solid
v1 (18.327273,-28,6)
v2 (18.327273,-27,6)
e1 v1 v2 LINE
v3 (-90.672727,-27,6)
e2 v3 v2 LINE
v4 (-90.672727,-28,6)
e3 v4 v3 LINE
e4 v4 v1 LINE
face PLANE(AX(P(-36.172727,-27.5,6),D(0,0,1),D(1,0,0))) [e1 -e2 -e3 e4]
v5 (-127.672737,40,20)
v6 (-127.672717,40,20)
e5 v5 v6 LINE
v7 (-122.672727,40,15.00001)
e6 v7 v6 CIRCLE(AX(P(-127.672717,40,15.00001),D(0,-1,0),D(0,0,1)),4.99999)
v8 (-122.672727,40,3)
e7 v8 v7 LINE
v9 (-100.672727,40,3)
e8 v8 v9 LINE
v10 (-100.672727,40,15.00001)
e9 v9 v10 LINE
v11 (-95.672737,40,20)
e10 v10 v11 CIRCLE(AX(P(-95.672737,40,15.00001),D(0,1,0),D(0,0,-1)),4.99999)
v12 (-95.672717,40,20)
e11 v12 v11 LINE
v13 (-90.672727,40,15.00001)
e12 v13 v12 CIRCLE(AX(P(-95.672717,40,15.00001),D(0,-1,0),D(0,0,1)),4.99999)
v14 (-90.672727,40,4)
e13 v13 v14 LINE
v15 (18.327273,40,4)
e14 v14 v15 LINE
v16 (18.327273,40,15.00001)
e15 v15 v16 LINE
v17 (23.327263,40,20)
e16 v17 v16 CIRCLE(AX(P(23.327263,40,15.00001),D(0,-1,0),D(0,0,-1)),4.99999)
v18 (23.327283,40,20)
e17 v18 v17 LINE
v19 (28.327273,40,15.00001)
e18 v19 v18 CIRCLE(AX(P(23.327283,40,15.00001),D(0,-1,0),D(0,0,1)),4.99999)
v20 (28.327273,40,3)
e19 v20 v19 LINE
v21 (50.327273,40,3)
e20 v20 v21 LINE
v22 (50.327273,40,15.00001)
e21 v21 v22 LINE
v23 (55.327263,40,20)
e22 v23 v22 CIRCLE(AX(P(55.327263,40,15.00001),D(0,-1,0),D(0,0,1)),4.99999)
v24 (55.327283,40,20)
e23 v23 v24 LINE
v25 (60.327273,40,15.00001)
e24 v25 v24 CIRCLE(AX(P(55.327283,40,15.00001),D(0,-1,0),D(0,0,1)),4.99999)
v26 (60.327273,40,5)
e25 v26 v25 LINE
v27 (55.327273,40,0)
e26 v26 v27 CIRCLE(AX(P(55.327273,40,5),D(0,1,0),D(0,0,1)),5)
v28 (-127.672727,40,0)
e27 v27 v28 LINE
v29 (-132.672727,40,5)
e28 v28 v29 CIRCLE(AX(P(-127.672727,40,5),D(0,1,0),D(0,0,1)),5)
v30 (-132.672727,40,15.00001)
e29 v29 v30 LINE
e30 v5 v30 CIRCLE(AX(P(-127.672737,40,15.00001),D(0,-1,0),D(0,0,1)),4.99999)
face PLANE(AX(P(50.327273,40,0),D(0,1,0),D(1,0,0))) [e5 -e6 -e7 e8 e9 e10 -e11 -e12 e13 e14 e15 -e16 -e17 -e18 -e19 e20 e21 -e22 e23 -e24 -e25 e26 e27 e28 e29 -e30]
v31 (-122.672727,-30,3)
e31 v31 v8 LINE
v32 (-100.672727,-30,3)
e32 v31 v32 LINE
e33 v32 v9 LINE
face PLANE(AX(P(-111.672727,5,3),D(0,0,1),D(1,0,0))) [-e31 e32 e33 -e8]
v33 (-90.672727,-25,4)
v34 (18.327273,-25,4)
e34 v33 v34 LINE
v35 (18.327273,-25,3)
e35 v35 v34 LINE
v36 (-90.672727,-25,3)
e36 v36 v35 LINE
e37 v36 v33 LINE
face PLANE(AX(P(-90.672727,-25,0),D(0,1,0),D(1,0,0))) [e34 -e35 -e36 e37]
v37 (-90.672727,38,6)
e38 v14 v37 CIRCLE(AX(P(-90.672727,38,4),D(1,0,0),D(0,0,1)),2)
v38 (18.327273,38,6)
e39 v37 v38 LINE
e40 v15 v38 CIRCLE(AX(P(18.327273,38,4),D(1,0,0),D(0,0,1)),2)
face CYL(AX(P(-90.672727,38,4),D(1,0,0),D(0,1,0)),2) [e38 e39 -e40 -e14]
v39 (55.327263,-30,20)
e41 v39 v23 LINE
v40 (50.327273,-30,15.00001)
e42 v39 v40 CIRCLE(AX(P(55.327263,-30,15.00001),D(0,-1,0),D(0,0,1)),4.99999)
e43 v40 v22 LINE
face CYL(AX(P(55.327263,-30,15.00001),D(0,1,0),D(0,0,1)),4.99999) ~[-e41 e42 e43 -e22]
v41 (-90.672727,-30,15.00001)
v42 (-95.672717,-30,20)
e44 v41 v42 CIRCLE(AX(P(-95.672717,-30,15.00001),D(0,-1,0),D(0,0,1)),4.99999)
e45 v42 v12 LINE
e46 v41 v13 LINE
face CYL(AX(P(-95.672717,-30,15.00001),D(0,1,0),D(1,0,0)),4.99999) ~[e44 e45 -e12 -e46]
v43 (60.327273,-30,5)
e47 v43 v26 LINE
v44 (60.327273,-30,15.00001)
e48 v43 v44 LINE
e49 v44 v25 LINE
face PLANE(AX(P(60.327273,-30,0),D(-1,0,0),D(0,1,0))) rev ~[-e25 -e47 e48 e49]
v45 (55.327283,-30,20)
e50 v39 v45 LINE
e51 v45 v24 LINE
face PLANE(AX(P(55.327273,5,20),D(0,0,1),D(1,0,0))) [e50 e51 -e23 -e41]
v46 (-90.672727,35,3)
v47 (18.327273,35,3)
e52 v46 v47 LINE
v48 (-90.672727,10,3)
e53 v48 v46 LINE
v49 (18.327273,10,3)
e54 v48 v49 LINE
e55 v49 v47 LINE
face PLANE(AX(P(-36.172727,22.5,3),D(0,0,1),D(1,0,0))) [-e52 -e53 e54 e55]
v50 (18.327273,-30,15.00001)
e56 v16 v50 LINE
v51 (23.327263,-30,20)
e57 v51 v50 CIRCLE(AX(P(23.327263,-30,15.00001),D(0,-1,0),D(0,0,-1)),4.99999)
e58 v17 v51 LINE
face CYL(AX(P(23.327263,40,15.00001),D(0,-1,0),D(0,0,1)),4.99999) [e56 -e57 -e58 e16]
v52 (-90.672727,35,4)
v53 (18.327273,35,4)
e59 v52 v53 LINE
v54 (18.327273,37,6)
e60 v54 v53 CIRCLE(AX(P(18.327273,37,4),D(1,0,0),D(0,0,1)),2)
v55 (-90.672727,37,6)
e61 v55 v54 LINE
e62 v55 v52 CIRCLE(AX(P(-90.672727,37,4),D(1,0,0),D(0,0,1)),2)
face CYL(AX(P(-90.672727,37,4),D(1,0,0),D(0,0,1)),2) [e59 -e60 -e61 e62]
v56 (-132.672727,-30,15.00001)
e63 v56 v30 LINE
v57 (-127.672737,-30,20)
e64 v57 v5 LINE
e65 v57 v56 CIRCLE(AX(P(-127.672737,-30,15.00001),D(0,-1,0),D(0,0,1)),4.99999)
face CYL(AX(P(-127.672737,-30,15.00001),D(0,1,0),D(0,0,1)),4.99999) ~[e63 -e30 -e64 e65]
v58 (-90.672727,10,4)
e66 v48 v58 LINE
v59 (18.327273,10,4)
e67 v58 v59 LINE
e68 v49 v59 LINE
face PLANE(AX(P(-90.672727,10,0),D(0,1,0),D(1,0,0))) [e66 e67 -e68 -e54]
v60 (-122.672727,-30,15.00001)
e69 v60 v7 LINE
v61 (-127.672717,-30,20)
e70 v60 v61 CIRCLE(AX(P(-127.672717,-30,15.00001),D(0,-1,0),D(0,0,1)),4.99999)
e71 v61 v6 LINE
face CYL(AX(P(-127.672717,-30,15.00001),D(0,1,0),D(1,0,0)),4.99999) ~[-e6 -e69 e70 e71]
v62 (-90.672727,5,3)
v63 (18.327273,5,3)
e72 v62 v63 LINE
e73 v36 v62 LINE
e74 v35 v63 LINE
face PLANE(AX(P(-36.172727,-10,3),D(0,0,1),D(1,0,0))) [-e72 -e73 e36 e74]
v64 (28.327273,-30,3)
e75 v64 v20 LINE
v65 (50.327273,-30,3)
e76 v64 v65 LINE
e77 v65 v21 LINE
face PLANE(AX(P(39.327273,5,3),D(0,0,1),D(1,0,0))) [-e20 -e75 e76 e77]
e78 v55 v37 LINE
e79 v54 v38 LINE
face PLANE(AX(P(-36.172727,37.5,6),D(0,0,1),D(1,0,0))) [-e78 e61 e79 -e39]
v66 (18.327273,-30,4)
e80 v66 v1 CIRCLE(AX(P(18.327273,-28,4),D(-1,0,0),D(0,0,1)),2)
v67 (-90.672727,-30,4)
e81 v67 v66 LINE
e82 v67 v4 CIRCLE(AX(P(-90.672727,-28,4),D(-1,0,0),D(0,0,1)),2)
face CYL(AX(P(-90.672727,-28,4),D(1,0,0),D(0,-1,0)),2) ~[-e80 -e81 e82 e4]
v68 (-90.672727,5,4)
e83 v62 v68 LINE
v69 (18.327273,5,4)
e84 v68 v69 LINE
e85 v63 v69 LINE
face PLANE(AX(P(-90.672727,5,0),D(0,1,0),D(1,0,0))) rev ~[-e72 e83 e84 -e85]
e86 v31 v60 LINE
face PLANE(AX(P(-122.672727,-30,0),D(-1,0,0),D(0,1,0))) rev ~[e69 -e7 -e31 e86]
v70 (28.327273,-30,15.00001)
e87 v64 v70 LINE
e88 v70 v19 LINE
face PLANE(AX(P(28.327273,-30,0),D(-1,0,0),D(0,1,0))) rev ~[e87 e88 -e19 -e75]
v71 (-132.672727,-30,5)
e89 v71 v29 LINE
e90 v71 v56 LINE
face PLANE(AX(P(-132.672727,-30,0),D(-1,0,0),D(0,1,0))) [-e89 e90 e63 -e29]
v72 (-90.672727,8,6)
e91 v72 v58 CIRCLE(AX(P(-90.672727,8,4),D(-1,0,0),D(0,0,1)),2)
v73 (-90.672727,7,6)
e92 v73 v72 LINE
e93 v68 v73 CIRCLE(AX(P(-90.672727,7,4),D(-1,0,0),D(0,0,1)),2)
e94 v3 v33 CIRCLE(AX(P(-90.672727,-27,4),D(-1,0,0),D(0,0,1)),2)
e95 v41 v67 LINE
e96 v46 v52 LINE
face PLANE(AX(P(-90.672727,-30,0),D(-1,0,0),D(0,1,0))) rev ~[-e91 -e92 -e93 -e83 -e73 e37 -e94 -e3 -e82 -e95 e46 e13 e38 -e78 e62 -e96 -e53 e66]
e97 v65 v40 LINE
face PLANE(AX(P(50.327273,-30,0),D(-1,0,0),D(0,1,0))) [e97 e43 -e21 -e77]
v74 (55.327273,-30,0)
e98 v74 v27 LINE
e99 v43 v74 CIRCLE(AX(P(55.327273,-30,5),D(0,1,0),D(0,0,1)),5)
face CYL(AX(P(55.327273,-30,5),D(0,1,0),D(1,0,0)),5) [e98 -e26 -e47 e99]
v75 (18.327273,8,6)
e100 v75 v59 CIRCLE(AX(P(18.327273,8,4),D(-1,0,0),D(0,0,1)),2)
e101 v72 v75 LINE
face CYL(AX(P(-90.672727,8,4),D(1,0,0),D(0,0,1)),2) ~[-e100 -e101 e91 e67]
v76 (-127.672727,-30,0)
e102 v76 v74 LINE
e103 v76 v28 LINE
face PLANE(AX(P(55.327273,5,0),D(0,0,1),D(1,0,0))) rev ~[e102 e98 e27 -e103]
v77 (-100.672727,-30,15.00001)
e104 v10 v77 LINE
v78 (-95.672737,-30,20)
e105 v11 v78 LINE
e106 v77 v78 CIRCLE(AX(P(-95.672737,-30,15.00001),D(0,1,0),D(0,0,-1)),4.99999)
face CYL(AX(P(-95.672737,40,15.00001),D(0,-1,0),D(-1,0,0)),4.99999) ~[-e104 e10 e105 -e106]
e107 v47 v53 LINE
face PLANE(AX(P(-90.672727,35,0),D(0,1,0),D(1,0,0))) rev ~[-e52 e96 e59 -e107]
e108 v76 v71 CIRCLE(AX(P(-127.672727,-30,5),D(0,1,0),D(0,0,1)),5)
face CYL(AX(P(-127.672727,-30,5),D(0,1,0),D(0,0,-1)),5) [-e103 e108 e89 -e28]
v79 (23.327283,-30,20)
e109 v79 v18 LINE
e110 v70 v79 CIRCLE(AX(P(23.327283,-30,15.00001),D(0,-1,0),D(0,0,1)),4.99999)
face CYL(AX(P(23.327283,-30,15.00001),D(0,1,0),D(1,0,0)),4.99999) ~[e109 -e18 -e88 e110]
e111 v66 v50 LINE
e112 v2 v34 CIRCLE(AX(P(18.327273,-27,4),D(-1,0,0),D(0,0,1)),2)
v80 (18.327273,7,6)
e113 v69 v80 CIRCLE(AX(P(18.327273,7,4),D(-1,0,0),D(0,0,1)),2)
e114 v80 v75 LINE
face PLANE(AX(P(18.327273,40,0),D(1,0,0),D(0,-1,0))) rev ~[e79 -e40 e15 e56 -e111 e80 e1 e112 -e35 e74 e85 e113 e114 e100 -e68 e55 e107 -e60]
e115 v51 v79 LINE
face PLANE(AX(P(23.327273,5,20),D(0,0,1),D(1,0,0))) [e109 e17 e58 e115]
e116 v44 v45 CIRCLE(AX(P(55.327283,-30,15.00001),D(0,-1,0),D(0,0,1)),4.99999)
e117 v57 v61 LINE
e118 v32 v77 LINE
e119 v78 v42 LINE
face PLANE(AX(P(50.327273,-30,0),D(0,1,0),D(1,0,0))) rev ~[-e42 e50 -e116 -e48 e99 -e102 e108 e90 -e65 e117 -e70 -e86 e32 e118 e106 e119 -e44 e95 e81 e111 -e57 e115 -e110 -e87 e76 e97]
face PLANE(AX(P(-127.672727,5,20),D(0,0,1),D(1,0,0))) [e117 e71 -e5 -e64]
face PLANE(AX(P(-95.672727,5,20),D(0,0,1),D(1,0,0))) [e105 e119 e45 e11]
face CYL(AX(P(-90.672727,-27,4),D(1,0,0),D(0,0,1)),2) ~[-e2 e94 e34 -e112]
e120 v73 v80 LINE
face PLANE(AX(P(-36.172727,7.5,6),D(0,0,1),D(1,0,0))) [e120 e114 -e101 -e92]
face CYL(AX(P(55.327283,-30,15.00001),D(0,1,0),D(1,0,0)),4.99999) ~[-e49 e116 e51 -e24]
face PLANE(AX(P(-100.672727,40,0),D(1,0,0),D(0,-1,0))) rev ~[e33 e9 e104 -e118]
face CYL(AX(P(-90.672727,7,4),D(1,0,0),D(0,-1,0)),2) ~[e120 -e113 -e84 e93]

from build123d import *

# Parameters (mm, degrees)
F0_W     = 22
F0_H     = 70
F1_DEPTH = 3
F0_W_2   = 109
F0_H_2   = 25
F0_H_3   = 30
F0_W_3   = 10
F2_DEPTH = 20
F0_H_4   = 5
F3_DEPTH = 6
F4_R     = 4.99999
F5_R     = 5
F6_R     = 2


# Not quite as in the source:
# - a fillet or chamfer is up to 0.001 mm smaller than in the source, because OpenCascade refuses the exact size


with BuildPart() as f1:
    # F0 (on Top) → F1 (new body)
    with BuildSketch(Plane.XY):
        with Locations((-111.672727108, 5)):
            Rectangle(F0_W, F0_H)
    extrude(amount=F1_DEPTH)



with BuildPart() as f1b:
    # F0 (on Top) → F1, piece 2 (new body)
    with BuildSketch(Plane.XY):
        with Locations((39.327272892, 5)):
            Rectangle(F0_W, F0_H)
    extrude(amount=F1_DEPTH)


with BuildPart() as f1c:
    # F0 (on Top) → F1, piece 3 (new body)
    with BuildSketch(Plane.XY):
        with Locations((-36.172727108, 22.5)):
            Rectangle(F0_W_2, F0_H_2)
    extrude(amount=F1_DEPTH)


with BuildPart() as f1d:
    # F0 (on Top) → F1, piece 4 (new body)
    with BuildSketch(Plane.XY):
        with Locations((-36.172727108, -10)):
            Rectangle(F0_W_2, F0_H_3)
    extrude(amount=F1_DEPTH)


with BuildPart() as f1_1:
    add(f1.part)

    add(f1b.part)  # F2 merges F1b

    add(f1c.part)  # F2 merges F1c

    add(f1d.part)  # F2 merges F1d
    # F0 (on Top) → F2 (join)
    with BuildSketch(Plane.XY):
        with Locations((55.327272892, 5)):
            Rectangle(F0_W_3, F0_H)
        with Locations((-127.672727108, 5)):
            Rectangle(F0_W_3, F0_H)
        Polygon((-100.672727108, -30), (-90.672727108, -30), (-90.672727108, -25), (-90.672727108, 5), (-90.672727108, 10), (-90.672727108, 35), (-90.672727108, 40), (-100.672727108, 40), align=None)
        Polygon((18.327272892, -30), (28.327272892, -30), (28.327272892, 40), (18.327272892, 40), (18.327272892, 35), (18.327272892, 10), (18.327272892, 5), (18.327272892, -25), align=None)
    extrude(amount=F2_DEPTH)

    # F0 (on Top) → F3 (join)
    with BuildSketch(Plane.XY):
        with Locations((-36.172727108, 7.5)):
            Rectangle(F0_W_2, F0_H_4)
        with Locations((-36.172727108, -27.5)):
            Rectangle(F0_W_2, F0_H_4)
        with Locations((-36.172727108, 37.5)):
            Rectangle(F0_W_2, F0_H_4)
    extrude(amount=F3_DEPTH)

    # F4 (radius 5 in the source; OpenCascade refuses exactly that, so slightly less here)
    f4_edges = [f1_1.edges().sort_by_distance(p)[0] for p in [
        (50.327273, 5, 20),
        (28.327273, 5, 20),
        (-100.672727, 5, 20),
        (-122.672727, 5, 20),
        (-132.672727, 5, 20),
        (-90.672727, 5, 20),
        (18.327273, 5, 20),
        (60.327273, 5, 20),
    ]]
    fillet(f4_edges, radius=F4_R)

    # F5
    f5_edges = [f1_1.edges().sort_by_distance(p)[0] for p in [
        (-132.672727, 5, 0),
        (60.327273, 5, 0),
    ]]
    fillet(f5_edges, radius=F5_R)

    # F6
    f6_edges = [f1_1.edges().sort_by_distance(p)[0] for p in [
        (-36.172727, 5, 6),
        (-36.172727, 10, 6),
        (-36.172727, -30, 6),
        (-36.172727, 40, 6),
        (-36.172727, 35, 6),
        (-36.172727, -25, 6),
    ]]
    fillet(f6_edges, radius=F6_R)


solid = f1_1.part
